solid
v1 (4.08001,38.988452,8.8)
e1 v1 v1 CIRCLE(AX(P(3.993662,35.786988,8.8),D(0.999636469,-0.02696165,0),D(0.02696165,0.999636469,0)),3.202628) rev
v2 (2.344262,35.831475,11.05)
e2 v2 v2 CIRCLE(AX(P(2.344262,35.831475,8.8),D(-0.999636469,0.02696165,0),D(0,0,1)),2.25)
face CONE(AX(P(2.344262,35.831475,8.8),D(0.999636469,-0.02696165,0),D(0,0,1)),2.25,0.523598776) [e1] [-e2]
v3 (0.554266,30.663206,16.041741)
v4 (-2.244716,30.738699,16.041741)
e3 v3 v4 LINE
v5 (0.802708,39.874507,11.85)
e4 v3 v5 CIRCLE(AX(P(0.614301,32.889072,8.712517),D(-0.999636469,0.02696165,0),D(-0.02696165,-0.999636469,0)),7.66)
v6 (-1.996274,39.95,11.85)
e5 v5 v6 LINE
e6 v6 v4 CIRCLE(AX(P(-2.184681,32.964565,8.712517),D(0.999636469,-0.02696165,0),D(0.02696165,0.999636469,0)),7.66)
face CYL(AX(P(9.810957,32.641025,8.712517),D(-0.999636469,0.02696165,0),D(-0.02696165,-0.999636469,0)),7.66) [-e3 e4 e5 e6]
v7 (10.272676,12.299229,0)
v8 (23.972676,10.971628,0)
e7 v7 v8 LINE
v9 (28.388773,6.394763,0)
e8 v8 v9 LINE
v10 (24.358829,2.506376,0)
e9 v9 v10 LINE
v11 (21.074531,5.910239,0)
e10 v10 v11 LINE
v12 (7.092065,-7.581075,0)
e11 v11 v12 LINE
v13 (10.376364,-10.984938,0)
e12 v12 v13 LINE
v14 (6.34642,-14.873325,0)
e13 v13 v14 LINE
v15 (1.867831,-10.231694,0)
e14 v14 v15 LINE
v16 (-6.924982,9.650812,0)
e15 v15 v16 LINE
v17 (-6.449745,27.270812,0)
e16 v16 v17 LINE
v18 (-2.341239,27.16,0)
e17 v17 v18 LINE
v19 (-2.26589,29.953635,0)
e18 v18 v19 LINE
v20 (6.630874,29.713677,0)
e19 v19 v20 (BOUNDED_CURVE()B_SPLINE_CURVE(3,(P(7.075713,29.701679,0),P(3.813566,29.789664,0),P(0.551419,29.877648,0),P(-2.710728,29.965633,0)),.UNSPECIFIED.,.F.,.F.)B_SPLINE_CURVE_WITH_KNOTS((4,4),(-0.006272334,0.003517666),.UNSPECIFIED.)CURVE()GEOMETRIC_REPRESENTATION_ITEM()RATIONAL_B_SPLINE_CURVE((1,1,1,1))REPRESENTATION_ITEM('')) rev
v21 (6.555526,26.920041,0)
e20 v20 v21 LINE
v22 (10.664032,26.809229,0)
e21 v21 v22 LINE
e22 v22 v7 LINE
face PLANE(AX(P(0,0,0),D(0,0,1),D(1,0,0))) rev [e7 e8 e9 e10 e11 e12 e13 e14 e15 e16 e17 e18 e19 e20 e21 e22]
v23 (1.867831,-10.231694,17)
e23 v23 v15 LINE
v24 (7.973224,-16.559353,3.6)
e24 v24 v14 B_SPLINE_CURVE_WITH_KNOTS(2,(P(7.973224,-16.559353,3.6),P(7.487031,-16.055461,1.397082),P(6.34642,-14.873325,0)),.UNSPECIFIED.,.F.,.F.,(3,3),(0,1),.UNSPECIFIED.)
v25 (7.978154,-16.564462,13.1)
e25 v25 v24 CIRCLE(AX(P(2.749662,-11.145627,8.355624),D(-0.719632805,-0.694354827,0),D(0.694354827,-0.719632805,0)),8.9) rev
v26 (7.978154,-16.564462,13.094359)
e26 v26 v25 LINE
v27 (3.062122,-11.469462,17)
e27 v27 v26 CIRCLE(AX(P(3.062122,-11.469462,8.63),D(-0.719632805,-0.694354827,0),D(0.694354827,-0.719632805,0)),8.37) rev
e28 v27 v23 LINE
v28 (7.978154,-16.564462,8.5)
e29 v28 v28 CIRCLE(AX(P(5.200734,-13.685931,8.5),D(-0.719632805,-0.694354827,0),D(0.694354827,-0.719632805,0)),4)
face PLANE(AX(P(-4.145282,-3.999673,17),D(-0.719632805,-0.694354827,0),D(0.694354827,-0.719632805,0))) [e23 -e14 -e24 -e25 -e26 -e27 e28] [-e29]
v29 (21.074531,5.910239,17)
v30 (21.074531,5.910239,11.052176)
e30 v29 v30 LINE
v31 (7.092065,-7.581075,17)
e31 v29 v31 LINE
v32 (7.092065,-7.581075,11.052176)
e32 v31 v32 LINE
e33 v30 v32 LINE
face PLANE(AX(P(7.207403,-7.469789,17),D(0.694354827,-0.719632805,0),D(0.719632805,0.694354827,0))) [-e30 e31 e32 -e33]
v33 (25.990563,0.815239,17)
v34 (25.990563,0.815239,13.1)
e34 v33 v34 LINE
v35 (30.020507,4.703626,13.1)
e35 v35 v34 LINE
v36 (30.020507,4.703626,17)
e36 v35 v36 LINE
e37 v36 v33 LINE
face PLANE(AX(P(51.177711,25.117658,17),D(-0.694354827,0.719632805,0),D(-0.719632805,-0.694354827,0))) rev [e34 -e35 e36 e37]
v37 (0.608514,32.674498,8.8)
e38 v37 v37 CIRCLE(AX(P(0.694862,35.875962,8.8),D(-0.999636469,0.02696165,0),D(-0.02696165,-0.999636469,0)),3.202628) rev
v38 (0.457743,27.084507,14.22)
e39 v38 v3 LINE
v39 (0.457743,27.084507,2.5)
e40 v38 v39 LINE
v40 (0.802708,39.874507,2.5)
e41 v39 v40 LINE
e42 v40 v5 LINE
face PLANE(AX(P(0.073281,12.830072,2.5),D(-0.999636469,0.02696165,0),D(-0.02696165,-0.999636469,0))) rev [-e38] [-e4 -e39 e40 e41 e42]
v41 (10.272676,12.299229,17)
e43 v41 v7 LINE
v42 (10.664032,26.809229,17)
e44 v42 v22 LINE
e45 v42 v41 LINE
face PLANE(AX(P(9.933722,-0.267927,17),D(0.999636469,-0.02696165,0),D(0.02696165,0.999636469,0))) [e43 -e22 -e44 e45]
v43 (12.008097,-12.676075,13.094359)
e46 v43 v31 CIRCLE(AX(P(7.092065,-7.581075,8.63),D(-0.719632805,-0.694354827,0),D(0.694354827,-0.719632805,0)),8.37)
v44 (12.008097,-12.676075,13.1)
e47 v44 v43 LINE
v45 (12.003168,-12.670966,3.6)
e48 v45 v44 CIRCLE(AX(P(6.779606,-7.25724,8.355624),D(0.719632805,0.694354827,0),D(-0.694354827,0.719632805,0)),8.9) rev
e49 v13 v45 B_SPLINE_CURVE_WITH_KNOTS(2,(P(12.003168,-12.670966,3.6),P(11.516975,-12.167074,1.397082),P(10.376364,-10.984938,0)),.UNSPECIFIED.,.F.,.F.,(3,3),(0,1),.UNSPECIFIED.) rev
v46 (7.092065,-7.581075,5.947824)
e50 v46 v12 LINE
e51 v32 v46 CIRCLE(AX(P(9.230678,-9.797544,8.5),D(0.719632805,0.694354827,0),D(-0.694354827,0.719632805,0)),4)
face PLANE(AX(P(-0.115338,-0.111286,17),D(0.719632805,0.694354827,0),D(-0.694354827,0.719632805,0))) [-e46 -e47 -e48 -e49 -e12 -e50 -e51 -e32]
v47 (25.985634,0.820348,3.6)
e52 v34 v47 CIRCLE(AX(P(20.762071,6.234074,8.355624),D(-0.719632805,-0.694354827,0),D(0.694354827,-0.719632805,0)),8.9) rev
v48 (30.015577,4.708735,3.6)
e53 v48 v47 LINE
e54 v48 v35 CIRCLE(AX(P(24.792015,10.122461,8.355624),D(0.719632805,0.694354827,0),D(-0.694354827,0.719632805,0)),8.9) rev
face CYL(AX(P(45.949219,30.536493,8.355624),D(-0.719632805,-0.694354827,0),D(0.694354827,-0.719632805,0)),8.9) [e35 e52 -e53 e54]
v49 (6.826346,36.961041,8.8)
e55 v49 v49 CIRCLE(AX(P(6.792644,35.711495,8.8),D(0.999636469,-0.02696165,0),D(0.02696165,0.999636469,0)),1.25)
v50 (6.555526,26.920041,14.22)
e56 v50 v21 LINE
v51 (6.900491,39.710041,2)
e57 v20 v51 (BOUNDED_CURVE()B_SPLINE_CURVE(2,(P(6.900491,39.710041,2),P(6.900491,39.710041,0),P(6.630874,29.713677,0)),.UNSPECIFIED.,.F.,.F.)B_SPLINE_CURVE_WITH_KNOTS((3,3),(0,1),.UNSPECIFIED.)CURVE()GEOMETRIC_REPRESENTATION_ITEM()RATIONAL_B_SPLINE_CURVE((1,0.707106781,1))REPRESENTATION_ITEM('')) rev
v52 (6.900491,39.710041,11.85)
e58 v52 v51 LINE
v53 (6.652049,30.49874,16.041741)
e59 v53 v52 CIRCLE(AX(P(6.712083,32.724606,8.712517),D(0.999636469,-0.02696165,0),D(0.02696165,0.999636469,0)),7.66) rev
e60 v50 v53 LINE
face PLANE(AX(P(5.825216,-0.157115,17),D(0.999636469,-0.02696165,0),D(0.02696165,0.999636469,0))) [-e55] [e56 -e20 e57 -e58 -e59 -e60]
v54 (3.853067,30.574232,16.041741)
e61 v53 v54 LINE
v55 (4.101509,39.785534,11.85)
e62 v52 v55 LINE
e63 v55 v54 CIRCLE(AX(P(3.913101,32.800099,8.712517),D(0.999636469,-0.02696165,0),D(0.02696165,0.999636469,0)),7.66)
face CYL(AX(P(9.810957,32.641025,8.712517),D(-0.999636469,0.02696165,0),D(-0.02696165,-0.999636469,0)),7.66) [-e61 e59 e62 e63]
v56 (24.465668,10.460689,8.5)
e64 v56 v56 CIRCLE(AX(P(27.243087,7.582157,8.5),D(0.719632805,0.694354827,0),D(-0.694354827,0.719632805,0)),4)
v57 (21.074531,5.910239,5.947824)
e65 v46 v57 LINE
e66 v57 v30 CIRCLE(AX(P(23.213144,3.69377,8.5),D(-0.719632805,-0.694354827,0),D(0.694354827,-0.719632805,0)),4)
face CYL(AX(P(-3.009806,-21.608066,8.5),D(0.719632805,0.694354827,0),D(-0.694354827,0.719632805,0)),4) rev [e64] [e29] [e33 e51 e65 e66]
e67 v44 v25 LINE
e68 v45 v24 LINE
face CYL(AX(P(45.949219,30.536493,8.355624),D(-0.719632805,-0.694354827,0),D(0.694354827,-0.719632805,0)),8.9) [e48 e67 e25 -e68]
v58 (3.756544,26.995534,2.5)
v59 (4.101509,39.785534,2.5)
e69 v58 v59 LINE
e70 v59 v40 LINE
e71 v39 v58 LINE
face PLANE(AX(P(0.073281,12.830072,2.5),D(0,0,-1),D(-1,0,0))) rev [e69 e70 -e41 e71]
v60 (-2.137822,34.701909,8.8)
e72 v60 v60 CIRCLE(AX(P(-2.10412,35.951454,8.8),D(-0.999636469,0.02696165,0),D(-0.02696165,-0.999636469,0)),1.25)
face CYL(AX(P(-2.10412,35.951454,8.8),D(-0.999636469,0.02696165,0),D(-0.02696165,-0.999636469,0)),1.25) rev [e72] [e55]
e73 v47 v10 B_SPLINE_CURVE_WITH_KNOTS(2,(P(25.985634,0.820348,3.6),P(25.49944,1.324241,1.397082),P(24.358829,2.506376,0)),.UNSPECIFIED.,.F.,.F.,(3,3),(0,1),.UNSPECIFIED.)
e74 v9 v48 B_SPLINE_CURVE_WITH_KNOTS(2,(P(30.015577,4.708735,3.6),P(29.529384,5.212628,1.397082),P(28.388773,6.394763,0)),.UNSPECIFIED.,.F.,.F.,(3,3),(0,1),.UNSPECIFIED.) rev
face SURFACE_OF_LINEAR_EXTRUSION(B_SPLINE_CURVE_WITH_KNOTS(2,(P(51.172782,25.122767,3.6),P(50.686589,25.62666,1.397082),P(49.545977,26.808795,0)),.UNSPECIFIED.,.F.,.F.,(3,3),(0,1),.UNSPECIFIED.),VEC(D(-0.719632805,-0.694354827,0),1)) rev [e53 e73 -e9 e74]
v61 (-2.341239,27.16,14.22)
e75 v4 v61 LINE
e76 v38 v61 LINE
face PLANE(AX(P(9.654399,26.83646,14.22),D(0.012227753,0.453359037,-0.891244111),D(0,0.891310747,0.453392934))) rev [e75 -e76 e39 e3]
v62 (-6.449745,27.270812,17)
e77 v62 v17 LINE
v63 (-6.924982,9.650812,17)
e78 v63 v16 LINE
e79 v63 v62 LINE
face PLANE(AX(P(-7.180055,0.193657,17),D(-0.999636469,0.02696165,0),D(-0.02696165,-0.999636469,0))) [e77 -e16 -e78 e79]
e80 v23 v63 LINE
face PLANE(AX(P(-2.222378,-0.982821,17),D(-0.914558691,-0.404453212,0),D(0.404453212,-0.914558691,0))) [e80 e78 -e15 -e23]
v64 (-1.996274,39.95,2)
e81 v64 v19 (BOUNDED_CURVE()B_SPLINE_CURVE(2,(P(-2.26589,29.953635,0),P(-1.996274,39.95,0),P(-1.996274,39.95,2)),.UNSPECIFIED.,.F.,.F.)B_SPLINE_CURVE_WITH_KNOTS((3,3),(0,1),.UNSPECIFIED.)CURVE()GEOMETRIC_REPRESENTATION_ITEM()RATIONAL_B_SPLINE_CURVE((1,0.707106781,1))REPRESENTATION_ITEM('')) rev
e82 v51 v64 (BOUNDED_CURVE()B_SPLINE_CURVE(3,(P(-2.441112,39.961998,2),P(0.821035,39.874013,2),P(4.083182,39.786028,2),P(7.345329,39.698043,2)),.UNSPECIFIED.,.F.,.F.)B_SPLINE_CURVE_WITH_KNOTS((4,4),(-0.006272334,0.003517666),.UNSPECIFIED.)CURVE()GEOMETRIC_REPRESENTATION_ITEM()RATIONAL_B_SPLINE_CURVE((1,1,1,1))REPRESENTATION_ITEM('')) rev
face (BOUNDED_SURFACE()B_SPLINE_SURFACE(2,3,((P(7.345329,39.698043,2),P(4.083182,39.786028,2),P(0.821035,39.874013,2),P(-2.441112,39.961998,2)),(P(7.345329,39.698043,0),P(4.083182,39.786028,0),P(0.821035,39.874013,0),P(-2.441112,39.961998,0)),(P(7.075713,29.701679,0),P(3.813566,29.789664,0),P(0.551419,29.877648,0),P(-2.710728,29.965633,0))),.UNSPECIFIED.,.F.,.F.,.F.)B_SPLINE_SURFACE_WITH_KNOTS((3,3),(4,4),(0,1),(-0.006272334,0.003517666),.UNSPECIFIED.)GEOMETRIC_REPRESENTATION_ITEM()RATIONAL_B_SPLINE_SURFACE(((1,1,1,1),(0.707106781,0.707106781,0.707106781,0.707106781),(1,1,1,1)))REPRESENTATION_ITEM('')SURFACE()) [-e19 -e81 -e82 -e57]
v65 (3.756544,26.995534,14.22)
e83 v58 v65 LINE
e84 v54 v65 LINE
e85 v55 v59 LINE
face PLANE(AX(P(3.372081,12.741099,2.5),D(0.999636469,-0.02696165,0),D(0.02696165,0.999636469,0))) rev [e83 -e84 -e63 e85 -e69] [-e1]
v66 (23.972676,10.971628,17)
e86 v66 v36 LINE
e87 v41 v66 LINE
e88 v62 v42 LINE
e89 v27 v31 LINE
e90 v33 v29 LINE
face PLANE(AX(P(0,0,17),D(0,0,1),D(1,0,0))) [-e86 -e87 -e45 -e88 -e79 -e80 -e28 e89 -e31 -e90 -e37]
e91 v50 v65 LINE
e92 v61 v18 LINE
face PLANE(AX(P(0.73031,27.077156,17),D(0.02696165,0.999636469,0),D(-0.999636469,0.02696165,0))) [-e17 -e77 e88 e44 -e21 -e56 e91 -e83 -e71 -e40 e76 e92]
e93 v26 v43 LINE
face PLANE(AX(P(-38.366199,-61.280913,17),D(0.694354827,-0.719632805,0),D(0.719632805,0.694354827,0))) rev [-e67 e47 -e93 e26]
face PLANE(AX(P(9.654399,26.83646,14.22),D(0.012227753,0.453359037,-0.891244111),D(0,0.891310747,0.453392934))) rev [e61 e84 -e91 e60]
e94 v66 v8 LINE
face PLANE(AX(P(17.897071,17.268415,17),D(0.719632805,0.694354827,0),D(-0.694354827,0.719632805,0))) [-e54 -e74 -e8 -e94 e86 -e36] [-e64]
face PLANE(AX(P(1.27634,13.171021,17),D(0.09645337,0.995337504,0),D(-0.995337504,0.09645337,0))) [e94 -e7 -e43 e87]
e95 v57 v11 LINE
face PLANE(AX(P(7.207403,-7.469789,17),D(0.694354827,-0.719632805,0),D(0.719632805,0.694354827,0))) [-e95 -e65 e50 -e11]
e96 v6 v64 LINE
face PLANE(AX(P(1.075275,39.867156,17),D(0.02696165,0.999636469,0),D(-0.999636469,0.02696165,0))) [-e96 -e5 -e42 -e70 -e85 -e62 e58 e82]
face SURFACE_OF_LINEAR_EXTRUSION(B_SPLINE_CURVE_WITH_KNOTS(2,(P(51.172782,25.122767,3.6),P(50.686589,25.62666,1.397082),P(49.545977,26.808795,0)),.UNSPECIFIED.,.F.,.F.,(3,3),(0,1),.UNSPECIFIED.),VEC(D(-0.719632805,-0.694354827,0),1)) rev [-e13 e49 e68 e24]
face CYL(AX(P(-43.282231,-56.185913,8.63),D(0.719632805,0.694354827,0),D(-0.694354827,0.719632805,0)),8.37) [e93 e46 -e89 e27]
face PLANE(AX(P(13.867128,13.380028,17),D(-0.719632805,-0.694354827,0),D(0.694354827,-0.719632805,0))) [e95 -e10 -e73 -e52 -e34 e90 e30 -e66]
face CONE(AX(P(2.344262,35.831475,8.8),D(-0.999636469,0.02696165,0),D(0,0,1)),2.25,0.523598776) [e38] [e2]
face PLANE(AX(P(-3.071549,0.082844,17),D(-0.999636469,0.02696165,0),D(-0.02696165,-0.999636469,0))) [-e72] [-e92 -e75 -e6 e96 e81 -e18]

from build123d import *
from build123d.topology import SkipClean

# Parameters (mm, degrees)
BOSS_EXTRUDE1_DEPTH            = 17
CUT_EXTRUDE1_DEPTH             = 12
CUT_EXTRUDE2_DEPTH             = 35
CUT_EXTRUDE4_DEPTH             = 70
SKETCH8_R                      = 4
CUT_EXTRUDE5_DEPTH             = 47.01609876
CUT_EXTRUDE6_START             = -12.794651
SKETCH9_W                      = 3.3
SKETCH9_H                      = 13.87251724
CUT_EXTRUDE6_DEPTH             = 12.794651
F_2_5_2_5_DIAMETER_HOLE1_D     = 2.5
F_2_5_2_5_DIAMETER_HOLE1_DEPTH = 10
F_2_5_2_5_DIAMETER_HOLE1_TIP   = 0.751075774
SKETCH12_R                     = 2.25
SKETCH12_R_2                   = 1.25
EXTRUDE_THIN1_DEPTH            = 1.65
EXTRUDE_THIN1_TAPER            = -30
EXTRUDE_THIN1_OTHER_WAY_DEPTH  = 1.65
EXTRUDE_THIN1_OTHER_WAY_TAPER  = -30
SKETCH13_R                     = 1.25
CUT_EXTRUDE7_DEPTH             = 51.298409268
FILLET1_SIZE                   = 10
FILLET1_SIZE_2                 = 2


with BuildPart() as part:
    # Sketch1 → Boss-Extrude1 (new body)
    with BuildSketch(Plane.XY):
        Polygon((9.214105344, -17.845408642), (1.867831272, -10.231693567), (-6.924981548, 9.65081238), (-6.44974452, 27.27081238), (-2.341238634, 27.16), (-1.996273731, 39.95), (6.90049084, 39.710041319), (6.555525937, 26.920041319), (10.664031823, 26.80922894), (10.272676019, 12.29922894), (23.972676019, 10.97162784), (31.256458157, 3.422679717), (27.22651445, -0.465707315), (21.07453068, 5.910239336), (7.092065282, -7.581074959), (13.244049051, -13.95702161), align=None)
    extrude(amount=BOSS_EXTRUDE1_DEPTH)

    # Sketch3 → Cut-Extrude1 (cut)
    with BuildSketch(Plane(origin=(-3.071548911, 0.082844142, 0), x_dir=(0, 0, 1), z_dir=(-0.9996364686497187, 0.026961649532627044, 0))):
        with BuildLine():
            Line((0, 41.347002833), (0, 39.88165409))
            Line((0, 39.88165409), (11.85, 39.88165409))
            ThreePointArc((11.85, 39.88165409), (15.684994113, 36.06545508), (16.041740609, 30.667002833))
            Line((16.041740609, 30.667002833), (14.22, 27.087002833))
            Line((14.22, 27.087002833), (17.68, 27.087002833))
            Line((17.68, 27.087002833), (17.68, 41.347002833))
            Line((17.68, 41.347002833), (0, 41.347002833))
        make_face()
    extrude(amount=-CUT_EXTRUDE1_DEPTH, mode=Mode.SUBTRACT)

    # Sketch4 → Cut-Extrude2 (cut, symmetric)
    with BuildSketch(Plane(origin=(13.867127573, 13.38002785, 0), x_dir=(0, 0, 1), z_dir=(-0.7196328048525186, -0.6943548272894032, 0))):
        with BuildLine():
            Line((-2.314754212, -10.38), (0, -10.38))
            Line((0, -10.38), (0, -15.11))
            add(Edge.make_bspline(
                [(3.6, -17.452900819), (1.397081859, -16.752692527), (0, -15.11)],
                knots=[0, 0, 0, 1, 1, 1], degree=2))
            ThreePointArc((3.6, -17.452900819), (8.348973573, -18.829997515), (13.1, -17.46))
            Line((13.1, -17.46), (17, -17.46))
            Line((17, -17.46), (17, -10.38))
            Line((17, -10.38), (19.895245788, -10.38))
            Line((19.895245788, -10.38), (19.895245788, -23.53))
            Line((19.895245788, -23.53), (-2.314754212, -23.53))
            Line((-2.314754212, -23.53), (-2.314754212, -10.38))
        make_face()
    extrude(amount=CUT_EXTRUDE2_DEPTH, both=True, mode=Mode.SUBTRACT)

    # Sketch7 → Cut-Extrude4 (cut)
    with BuildSketch(Plane(origin=(-0.115337826, -0.111286444, 0), x_dir=(0, 0, -1), z_dir=(0.7196328048525139, 0.6943548272894081, 0))):
        with BuildLine():
            Line((-17, -17.46), (-13.094358857, -17.46))
            ThreePointArc((-13.094358857, -17.46), (-15.958832909, -14.422908382), (-17, -10.38))
            Line((-17, -10.38), (-17, -17.46))
        make_face()
    extrude(amount=-CUT_EXTRUDE4_DEPTH, mode=Mode.SUBTRACT)

    # Sketch8 → Cut-Extrude5 (cut, through all)
    with BuildSketch(Plane(origin=(17.89707128, 17.268414883, 0), x_dir=(0, 0, -1), z_dir=(0.7196328048525137, 0.6943548272894083, 0))):
        with Locations(Location((-8.5, -13.46, 0), (0, 0, 90))):
            Circle(SKETCH8_R)
    extrude(amount=-CUT_EXTRUDE5_DEPTH, mode=Mode.SUBTRACT)

    # Sketch9 → Cut-Extrude6 (cut)
    with SkipClean():  # the faces are left unmerged after this step: merging them gives an invalid solid
        with BuildSketch(Plane(origin=(1.07527518, 39.867155858, 0), x_dir=(0.9996364686497184, -0.026961649532630364, 0), z_dir=(0.026961649532630364, 0.9996364686497184, 0)).offset(CUT_EXTRUDE6_START)):
            with Locations((1.377334079, -9.43625862)):
                Rectangle(SKETCH9_W, SKETCH9_H)
        extrude(amount=CUT_EXTRUDE6_DEPTH, mode=Mode.SUBTRACT)

    # Ø2.5 (2.5) Diameter Hole1
    with Locations(Plane(origin=(-3.071548911, 0.082844142, 0), x_dir=(0, 0, 1), z_dir=(-0.9996364686497187, 0.026961649532627044, 0))):
        with Locations((8.8, 35.88165409)):
            Hole(F_2_5_2_5_DIAMETER_HOLE1_D / 2, depth=F_2_5_2_5_DIAMETER_HOLE1_DEPTH)
            with Locations((0, 0, -(F_2_5_2_5_DIAMETER_HOLE1_DEPTH + F_2_5_2_5_DIAMETER_HOLE1_TIP / 2))):  # 118° drill point
                Cone(0, F_2_5_2_5_DIAMETER_HOLE1_D / 2, F_2_5_2_5_DIAMETER_HOLE1_TIP, mode=Mode.SUBTRACT)

    # Sketch12 → Extrude-Thin1 (add)
    with SkipClean():  # the faces are left unmerged after this step: merging them gives an invalid solid
        with BuildSketch(Plane(origin=(1.376833375, -0.037135199, 0), x_dir=(0, 0, 1), z_dir=(-0.9996364686497184, 0.02696164953263036, 0))):
            with Locations((8.8, 35.88165409)):
                Circle(SKETCH12_R)
            with Locations((8.8, 35.88165409)):
                Circle(SKETCH12_R_2, mode=Mode.SUBTRACT)
        extrude(amount=-EXTRUDE_THIN1_DEPTH, taper=EXTRUDE_THIN1_TAPER)

    # Sketch12 → Extrude-Thin1 other way (add)
    with SkipClean():  # the faces are left unmerged after this step: merging them gives an invalid solid
        with BuildSketch(Plane(origin=(1.376833375, -0.037135199, 0), x_dir=(0, 0, 1), z_dir=(-0.9996364686497184, 0.02696164953263036, 0))):
            with Locations((8.8, 35.88165409)):
                Circle(SKETCH12_R)
            with Locations((8.8, 35.88165409)):
                Circle(SKETCH12_R_2, mode=Mode.SUBTRACT)
        extrude(amount=EXTRUDE_THIN1_OTHER_WAY_DEPTH, taper=EXTRUDE_THIN1_OTHER_WAY_TAPER)

    # Sketch13 → Cut-Extrude7 (cut, through all)
    with SkipClean():  # the faces are left unmerged after this step: merging them gives an invalid solid
        with BuildSketch(Plane(origin=(5.82521566, -0.157114539, 0), x_dir=(0, 0, -1), z_dir=(0.9996364686497184, -0.02696164953263123, 0))):
            with Locations(Location((-8.8, 35.88165409, 0), (0, 0, 270))):
                Circle(SKETCH13_R)
        extrude(amount=-CUT_EXTRUDE7_DEPTH, mode=Mode.SUBTRACT)

    # Fillet1
    # an asymmetric fillet: 10, 2 mm, written as the material it takes off along each edge
    with BuildSketch(Plane(origin=(-26.987185447, 40.624041238, 0), x_dir=(-0.02696164953263108, -0.9996364686497184, 0), z_dir=(0.9996364686497184, -0.02696164953263108, 0))) as fillet1_piece_1:
        with BuildLine():
            Bezier((FILLET1_SIZE, 0), (0, 0), (0, -FILLET1_SIZE_2), weights=[1, 0.707106781, 1])
            Line((0, -FILLET1_SIZE_2), (0, 0))
            Line((0, 0), (FILLET1_SIZE, 0))
        make_face()
    extrude(amount=58.9, mode=Mode.SUBTRACT)


solid = part.part
